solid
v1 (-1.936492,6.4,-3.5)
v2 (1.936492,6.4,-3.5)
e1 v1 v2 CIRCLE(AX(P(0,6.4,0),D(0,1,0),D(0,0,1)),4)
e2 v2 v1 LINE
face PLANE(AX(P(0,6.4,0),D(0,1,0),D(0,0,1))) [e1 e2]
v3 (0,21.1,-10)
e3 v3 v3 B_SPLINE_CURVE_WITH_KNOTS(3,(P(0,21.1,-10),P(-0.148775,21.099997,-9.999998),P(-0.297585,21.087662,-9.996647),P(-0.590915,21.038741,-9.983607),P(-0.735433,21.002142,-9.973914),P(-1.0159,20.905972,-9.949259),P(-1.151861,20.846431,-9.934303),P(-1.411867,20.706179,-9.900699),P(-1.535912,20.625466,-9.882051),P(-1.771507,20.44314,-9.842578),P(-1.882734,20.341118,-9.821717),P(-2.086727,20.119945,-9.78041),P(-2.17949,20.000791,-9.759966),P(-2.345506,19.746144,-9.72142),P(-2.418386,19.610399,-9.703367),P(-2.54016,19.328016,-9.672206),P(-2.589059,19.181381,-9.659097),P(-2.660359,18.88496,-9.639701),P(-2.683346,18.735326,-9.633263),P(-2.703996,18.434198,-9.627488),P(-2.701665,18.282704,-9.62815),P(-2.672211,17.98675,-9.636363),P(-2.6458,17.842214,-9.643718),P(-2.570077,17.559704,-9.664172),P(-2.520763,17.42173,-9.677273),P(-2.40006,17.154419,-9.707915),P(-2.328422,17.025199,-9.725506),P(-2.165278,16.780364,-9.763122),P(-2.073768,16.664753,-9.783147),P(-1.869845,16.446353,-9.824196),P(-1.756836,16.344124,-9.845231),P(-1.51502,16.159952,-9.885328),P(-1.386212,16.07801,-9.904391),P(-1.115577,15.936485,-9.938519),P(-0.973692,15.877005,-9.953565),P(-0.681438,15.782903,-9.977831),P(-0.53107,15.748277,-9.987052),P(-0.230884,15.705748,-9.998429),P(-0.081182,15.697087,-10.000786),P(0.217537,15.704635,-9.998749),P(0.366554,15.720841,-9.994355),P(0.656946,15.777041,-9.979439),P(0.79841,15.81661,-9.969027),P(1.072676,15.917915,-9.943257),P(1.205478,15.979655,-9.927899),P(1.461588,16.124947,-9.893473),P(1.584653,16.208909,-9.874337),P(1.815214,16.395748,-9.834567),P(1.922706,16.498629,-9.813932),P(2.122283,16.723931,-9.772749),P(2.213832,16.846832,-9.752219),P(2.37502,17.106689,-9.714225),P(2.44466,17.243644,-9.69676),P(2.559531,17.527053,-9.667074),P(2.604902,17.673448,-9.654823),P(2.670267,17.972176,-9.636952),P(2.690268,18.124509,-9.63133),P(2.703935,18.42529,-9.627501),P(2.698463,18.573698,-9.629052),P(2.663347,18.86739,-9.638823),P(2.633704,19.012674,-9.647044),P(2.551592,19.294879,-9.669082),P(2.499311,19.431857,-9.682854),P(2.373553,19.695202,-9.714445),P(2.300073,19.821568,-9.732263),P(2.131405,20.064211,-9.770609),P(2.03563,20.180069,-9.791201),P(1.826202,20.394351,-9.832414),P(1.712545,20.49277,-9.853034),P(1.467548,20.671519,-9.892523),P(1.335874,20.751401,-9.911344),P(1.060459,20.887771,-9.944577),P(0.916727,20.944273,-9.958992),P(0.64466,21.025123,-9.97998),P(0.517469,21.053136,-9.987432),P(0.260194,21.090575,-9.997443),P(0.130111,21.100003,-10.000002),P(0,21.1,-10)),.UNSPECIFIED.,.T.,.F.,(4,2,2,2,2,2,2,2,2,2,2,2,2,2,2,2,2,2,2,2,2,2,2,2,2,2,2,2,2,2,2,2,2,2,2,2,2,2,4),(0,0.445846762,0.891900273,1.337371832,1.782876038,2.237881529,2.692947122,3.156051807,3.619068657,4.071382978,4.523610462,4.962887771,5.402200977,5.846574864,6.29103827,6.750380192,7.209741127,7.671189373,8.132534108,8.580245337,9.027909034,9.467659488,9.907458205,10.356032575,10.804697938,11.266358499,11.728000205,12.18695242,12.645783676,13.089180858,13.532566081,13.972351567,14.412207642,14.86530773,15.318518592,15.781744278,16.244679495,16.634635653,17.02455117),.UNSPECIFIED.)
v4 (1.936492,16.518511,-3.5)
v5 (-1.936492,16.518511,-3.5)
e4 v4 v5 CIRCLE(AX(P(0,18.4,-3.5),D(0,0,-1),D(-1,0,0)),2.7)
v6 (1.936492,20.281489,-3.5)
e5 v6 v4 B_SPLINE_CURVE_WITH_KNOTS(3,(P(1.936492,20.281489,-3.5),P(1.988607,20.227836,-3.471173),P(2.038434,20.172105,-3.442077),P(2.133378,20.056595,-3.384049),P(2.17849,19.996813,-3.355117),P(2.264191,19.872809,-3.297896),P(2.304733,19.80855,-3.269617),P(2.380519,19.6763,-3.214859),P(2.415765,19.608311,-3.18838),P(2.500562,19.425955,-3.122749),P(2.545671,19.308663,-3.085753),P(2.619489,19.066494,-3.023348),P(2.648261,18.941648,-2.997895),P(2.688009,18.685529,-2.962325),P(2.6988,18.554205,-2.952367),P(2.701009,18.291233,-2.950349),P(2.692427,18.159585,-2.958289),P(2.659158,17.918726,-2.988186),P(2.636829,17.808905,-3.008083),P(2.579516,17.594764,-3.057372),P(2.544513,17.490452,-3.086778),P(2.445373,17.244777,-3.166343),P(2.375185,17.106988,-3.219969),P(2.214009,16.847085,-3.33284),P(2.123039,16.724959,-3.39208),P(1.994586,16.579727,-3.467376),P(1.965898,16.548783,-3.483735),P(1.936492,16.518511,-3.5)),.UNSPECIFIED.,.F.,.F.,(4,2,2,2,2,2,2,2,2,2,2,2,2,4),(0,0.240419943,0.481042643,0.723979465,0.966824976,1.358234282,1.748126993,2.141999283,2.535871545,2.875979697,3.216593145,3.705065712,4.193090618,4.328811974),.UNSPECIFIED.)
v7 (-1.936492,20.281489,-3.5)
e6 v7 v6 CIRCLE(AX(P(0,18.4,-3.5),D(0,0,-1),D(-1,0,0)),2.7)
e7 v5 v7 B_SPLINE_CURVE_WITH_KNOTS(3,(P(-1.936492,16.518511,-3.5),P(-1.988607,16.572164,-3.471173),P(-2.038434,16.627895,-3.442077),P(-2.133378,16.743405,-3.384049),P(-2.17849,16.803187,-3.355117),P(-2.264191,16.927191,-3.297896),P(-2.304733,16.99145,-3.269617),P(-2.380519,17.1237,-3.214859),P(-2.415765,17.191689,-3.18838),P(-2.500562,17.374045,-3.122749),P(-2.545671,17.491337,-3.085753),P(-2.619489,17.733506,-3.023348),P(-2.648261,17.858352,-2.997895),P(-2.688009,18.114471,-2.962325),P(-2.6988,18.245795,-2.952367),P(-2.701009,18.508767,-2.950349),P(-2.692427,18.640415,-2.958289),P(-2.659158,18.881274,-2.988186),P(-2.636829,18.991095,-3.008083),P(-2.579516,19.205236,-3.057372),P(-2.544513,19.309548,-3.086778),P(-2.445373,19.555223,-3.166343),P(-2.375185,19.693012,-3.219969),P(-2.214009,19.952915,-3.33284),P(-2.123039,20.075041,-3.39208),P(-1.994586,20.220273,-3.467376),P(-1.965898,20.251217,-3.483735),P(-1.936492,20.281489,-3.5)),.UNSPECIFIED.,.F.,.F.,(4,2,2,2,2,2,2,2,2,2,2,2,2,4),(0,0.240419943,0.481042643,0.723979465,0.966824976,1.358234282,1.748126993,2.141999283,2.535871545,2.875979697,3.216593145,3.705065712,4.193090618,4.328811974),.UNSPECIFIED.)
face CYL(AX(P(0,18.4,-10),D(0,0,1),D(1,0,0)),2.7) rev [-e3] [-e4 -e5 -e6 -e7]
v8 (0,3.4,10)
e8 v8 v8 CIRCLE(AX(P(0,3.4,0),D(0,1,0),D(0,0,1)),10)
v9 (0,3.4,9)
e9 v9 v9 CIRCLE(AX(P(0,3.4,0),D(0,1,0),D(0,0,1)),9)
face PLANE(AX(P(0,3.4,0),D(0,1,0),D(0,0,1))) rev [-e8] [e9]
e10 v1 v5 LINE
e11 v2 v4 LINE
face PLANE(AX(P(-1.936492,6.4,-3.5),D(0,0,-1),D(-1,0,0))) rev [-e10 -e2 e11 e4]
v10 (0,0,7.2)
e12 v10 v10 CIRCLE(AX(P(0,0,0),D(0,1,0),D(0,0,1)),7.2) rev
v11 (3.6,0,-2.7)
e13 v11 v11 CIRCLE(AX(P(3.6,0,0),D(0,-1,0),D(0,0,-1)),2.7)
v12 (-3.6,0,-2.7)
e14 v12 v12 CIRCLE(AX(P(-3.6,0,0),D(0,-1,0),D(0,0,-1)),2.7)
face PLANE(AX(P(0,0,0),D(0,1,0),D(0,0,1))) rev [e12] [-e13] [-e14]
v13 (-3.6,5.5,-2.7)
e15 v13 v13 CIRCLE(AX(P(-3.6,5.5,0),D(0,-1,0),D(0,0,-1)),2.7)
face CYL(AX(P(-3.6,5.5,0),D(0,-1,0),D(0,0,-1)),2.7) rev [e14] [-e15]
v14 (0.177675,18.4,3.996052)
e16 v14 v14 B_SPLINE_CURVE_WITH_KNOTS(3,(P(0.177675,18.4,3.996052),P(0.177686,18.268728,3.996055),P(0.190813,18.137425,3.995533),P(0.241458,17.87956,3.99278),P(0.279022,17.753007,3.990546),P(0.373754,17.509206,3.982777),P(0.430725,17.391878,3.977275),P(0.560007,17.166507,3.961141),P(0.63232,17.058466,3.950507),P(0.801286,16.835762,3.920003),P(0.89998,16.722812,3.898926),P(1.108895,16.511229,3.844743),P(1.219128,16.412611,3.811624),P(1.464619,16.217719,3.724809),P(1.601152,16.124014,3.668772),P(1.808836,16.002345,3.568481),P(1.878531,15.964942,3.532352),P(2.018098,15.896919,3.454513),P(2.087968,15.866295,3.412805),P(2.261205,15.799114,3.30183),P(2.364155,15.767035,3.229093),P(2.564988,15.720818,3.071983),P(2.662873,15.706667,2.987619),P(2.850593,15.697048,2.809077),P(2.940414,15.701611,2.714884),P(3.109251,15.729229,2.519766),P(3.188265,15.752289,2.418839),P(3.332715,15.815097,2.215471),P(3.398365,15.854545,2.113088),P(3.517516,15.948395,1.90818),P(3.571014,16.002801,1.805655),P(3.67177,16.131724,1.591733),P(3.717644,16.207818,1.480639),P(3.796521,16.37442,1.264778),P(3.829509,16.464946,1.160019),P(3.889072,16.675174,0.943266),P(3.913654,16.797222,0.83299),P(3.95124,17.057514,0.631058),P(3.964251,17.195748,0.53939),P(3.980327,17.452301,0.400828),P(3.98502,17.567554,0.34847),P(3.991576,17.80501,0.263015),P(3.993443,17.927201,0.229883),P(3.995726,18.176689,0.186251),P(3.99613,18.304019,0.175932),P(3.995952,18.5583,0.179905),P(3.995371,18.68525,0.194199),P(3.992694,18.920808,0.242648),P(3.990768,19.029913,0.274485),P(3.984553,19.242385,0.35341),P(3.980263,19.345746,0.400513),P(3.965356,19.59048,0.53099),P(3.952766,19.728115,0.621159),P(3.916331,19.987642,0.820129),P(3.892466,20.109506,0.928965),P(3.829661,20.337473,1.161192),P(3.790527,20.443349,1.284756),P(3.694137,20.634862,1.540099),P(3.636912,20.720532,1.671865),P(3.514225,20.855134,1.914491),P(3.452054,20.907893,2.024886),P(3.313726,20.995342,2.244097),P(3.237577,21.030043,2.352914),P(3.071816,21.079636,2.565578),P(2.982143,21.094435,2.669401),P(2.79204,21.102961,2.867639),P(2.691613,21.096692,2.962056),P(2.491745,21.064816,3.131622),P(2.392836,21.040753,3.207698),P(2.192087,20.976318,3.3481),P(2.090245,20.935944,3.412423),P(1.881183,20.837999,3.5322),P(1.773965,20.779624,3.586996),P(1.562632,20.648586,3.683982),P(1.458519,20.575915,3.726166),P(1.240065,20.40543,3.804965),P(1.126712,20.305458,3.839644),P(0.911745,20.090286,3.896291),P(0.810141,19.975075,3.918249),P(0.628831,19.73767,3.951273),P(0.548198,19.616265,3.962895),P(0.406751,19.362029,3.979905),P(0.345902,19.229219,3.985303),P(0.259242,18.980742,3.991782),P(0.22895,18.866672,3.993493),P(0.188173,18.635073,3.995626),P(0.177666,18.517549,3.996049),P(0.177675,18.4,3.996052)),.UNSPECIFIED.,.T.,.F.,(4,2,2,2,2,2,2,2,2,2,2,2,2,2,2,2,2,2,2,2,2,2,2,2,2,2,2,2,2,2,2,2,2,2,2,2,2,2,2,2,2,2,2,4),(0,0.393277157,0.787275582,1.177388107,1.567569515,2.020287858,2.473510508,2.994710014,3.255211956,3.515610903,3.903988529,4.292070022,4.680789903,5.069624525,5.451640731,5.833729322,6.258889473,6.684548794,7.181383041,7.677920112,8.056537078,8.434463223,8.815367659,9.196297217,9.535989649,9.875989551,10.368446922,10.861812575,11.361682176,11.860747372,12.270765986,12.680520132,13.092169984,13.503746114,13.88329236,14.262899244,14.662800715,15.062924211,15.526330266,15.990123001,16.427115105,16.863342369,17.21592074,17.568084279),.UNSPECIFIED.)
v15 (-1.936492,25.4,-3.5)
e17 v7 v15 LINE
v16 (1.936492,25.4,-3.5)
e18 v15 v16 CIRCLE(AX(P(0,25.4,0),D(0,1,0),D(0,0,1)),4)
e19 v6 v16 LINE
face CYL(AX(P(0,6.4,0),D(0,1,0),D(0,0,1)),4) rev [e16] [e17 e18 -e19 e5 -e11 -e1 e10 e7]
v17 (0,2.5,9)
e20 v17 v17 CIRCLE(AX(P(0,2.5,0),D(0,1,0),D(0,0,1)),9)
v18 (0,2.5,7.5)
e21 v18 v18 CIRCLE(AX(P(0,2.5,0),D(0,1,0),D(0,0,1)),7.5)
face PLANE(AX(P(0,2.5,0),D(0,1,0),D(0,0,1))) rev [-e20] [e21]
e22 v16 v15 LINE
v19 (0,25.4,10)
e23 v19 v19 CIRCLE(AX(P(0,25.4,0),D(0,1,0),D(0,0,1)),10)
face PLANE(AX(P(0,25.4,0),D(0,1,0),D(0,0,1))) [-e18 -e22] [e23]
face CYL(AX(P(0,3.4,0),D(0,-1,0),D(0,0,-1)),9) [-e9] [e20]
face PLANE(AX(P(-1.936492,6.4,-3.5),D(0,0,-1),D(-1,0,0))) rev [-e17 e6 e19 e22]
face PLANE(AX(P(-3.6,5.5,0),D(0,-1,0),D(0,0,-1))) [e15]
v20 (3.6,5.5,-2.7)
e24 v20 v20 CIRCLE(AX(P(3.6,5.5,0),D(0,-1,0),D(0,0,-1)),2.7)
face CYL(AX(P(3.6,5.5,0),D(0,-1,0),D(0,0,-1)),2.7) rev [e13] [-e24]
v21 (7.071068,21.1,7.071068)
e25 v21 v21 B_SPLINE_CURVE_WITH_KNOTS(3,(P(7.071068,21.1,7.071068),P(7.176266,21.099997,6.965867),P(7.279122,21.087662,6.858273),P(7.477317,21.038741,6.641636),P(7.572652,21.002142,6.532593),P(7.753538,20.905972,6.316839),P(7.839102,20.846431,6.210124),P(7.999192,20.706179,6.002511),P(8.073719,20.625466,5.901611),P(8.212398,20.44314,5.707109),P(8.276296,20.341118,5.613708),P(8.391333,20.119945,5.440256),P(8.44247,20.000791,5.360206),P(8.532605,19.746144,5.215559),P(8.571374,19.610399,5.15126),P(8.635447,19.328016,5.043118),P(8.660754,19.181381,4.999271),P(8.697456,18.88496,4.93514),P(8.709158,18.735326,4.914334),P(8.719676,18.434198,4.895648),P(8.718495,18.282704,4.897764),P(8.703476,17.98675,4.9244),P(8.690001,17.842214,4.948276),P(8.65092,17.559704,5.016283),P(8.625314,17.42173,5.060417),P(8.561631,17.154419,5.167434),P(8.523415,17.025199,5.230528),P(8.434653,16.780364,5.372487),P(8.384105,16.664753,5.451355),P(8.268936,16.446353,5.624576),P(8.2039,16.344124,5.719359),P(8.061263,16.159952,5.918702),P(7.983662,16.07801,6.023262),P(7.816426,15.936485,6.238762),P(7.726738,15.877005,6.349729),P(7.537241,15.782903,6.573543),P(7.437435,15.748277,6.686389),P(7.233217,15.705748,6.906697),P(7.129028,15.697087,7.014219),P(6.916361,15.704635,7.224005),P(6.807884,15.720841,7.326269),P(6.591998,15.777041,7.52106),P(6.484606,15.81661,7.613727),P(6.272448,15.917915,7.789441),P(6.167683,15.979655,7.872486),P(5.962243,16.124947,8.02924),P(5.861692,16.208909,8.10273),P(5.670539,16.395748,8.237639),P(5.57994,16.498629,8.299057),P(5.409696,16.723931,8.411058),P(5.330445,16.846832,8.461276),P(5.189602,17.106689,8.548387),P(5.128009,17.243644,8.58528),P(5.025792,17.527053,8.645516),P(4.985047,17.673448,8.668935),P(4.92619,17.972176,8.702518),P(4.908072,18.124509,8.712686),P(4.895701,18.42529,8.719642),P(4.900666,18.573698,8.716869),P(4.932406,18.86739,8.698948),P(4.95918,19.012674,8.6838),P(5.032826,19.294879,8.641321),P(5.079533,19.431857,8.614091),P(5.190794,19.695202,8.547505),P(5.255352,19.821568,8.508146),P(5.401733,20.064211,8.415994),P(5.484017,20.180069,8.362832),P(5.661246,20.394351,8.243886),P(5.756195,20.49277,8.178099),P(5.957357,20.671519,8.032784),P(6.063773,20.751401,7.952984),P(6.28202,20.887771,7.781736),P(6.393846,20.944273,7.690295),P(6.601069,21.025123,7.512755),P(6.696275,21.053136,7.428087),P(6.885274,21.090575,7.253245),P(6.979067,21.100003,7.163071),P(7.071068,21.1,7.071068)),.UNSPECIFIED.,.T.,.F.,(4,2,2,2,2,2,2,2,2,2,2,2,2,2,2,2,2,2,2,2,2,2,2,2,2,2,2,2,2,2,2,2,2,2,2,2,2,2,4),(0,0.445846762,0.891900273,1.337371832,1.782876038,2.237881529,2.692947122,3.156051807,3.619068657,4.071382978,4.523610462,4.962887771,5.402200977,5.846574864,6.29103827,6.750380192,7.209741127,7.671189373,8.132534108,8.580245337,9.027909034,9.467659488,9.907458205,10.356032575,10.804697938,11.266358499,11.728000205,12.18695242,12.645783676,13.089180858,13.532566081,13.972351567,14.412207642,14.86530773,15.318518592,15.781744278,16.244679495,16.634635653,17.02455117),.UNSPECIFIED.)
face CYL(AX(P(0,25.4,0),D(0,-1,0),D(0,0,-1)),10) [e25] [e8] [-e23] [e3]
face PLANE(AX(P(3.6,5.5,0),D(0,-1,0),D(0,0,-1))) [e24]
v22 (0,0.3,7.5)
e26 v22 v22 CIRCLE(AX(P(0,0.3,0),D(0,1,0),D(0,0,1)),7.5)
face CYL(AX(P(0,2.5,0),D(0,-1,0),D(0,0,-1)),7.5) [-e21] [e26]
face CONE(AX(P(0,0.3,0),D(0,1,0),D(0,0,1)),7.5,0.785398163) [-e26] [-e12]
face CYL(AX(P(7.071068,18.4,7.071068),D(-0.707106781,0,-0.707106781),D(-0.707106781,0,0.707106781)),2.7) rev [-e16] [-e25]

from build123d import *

# Parameters (mm, degrees)
SKETCH1_R             = 7.5
BOSS_EXTRUDE1_DEPTH   = 2.5
SKETCH2_R             = 9
BOSS_EXTRUDE2_DEPTH   = 0.9
SKETCH3_R             = 10
BOSS_EXTRUDE3_DEPTH   = 22
SKETCH5_R             = 2.7
CUT_EXTRUDE1_DEPTH    = 5.5
CUT_EXTRUDE2_DEPTH    = 19
SKETCH7_R             = 2.7
CUT_EXTRUDE3_DEPTH    = 30.071635661
CIRPATTERN1_START     = 2.951270805
CIRPATTERN1_OUTLINE_R = 2.7
CIRPATTERN1_DEPTH     = 7.048729295
CHAMFER1_SIZE         = 0.3


# Read off the part's stored shape, not the designer's step: CirPattern1
with BuildPart() as part:
    # Sketch1 → Boss-Extrude1 (new body)
    with BuildSketch(Plane(origin=(0, 0, 0), x_dir=(1, 0, 0), z_dir=(0, 1, 0))):
        with Locations(Location((0, 0, 0), (0, 0, 270))):
            Circle(SKETCH1_R)
    extrude(amount=BOSS_EXTRUDE1_DEPTH)

    # Sketch2 → Boss-Extrude2 (add)
    with BuildSketch(Plane(origin=(0, 2.5, 0), x_dir=(1, 0, 0), z_dir=(0, 1, 0))):
        with Locations(Location((0, 0, 0), (0, 0, 270))):
            Circle(SKETCH2_R)
    extrude(amount=BOSS_EXTRUDE2_DEPTH)

    # Sketch3 → Boss-Extrude3 (add)
    with BuildSketch(Plane(origin=(0, 3.4, 0), x_dir=(1, 0, 0), z_dir=(0, 1, 0))):
        with Locations(Location((0, 0, 0), (0, 0, 270))):
            Circle(SKETCH3_R)
    extrude(amount=BOSS_EXTRUDE3_DEPTH)

    # Sketch5 → Cut-Extrude1 (cut)
    with BuildSketch(Plane.XZ):
        with Locations(Location((3.6, 0, 0), (0, 0, 270))):
            Circle(SKETCH5_R)
        with Locations(Location((-3.6, 0, 0), (0, 0, 270))):
            Circle(SKETCH5_R)
    extrude(amount=-CUT_EXTRUDE1_DEPTH, mode=Mode.SUBTRACT)

    # Sketch6 → Cut-Extrude2 (cut)
    with BuildSketch(Plane(origin=(0, 25.4, 0), x_dir=(1, 0, 0), z_dir=(0, 1, 0))):
        with BuildLine():
            Line((-1.936491673, 3.5), (1.936491673, 3.5))
            ThreePointArc((1.936491673, 3.5), (0, -4), (-1.936491673, 3.5))
        make_face()
    extrude(amount=-CUT_EXTRUDE2_DEPTH, mode=Mode.SUBTRACT)

    # Sketch7 → Cut-Extrude3 (cut, through all)
    with BuildSketch(Plane.XY):
        with Locations(Location((0, 18.4, 0), (0, 0, 315.82536203))):
            Circle(SKETCH7_R)
    extrude(amount=-CUT_EXTRUDE3_DEPTH, mode=Mode.SUBTRACT)

    # CirPattern1 outline → CirPattern1 (cut)
    with BuildSketch(Plane(origin=(0, 0, 0), x_dir=(0.7071067811865509, 0, -0.707106781186544), z_dir=(0.707106781186544, 0, 0.707106781186551)).offset(CIRPATTERN1_START)):
        with Locations((0, 18.4)):
            Circle(CIRPATTERN1_OUTLINE_R)
    extrude(amount=CIRPATTERN1_DEPTH, mode=Mode.SUBTRACT)

    # Chamfer1
    chamfer1_edges = [part.edges().sort_by_distance(p)[0] for p in [
        (0, 0, -7.5),
    ]]
    chamfer(chamfer1_edges, length=CHAMFER1_SIZE)


solid = part.part
